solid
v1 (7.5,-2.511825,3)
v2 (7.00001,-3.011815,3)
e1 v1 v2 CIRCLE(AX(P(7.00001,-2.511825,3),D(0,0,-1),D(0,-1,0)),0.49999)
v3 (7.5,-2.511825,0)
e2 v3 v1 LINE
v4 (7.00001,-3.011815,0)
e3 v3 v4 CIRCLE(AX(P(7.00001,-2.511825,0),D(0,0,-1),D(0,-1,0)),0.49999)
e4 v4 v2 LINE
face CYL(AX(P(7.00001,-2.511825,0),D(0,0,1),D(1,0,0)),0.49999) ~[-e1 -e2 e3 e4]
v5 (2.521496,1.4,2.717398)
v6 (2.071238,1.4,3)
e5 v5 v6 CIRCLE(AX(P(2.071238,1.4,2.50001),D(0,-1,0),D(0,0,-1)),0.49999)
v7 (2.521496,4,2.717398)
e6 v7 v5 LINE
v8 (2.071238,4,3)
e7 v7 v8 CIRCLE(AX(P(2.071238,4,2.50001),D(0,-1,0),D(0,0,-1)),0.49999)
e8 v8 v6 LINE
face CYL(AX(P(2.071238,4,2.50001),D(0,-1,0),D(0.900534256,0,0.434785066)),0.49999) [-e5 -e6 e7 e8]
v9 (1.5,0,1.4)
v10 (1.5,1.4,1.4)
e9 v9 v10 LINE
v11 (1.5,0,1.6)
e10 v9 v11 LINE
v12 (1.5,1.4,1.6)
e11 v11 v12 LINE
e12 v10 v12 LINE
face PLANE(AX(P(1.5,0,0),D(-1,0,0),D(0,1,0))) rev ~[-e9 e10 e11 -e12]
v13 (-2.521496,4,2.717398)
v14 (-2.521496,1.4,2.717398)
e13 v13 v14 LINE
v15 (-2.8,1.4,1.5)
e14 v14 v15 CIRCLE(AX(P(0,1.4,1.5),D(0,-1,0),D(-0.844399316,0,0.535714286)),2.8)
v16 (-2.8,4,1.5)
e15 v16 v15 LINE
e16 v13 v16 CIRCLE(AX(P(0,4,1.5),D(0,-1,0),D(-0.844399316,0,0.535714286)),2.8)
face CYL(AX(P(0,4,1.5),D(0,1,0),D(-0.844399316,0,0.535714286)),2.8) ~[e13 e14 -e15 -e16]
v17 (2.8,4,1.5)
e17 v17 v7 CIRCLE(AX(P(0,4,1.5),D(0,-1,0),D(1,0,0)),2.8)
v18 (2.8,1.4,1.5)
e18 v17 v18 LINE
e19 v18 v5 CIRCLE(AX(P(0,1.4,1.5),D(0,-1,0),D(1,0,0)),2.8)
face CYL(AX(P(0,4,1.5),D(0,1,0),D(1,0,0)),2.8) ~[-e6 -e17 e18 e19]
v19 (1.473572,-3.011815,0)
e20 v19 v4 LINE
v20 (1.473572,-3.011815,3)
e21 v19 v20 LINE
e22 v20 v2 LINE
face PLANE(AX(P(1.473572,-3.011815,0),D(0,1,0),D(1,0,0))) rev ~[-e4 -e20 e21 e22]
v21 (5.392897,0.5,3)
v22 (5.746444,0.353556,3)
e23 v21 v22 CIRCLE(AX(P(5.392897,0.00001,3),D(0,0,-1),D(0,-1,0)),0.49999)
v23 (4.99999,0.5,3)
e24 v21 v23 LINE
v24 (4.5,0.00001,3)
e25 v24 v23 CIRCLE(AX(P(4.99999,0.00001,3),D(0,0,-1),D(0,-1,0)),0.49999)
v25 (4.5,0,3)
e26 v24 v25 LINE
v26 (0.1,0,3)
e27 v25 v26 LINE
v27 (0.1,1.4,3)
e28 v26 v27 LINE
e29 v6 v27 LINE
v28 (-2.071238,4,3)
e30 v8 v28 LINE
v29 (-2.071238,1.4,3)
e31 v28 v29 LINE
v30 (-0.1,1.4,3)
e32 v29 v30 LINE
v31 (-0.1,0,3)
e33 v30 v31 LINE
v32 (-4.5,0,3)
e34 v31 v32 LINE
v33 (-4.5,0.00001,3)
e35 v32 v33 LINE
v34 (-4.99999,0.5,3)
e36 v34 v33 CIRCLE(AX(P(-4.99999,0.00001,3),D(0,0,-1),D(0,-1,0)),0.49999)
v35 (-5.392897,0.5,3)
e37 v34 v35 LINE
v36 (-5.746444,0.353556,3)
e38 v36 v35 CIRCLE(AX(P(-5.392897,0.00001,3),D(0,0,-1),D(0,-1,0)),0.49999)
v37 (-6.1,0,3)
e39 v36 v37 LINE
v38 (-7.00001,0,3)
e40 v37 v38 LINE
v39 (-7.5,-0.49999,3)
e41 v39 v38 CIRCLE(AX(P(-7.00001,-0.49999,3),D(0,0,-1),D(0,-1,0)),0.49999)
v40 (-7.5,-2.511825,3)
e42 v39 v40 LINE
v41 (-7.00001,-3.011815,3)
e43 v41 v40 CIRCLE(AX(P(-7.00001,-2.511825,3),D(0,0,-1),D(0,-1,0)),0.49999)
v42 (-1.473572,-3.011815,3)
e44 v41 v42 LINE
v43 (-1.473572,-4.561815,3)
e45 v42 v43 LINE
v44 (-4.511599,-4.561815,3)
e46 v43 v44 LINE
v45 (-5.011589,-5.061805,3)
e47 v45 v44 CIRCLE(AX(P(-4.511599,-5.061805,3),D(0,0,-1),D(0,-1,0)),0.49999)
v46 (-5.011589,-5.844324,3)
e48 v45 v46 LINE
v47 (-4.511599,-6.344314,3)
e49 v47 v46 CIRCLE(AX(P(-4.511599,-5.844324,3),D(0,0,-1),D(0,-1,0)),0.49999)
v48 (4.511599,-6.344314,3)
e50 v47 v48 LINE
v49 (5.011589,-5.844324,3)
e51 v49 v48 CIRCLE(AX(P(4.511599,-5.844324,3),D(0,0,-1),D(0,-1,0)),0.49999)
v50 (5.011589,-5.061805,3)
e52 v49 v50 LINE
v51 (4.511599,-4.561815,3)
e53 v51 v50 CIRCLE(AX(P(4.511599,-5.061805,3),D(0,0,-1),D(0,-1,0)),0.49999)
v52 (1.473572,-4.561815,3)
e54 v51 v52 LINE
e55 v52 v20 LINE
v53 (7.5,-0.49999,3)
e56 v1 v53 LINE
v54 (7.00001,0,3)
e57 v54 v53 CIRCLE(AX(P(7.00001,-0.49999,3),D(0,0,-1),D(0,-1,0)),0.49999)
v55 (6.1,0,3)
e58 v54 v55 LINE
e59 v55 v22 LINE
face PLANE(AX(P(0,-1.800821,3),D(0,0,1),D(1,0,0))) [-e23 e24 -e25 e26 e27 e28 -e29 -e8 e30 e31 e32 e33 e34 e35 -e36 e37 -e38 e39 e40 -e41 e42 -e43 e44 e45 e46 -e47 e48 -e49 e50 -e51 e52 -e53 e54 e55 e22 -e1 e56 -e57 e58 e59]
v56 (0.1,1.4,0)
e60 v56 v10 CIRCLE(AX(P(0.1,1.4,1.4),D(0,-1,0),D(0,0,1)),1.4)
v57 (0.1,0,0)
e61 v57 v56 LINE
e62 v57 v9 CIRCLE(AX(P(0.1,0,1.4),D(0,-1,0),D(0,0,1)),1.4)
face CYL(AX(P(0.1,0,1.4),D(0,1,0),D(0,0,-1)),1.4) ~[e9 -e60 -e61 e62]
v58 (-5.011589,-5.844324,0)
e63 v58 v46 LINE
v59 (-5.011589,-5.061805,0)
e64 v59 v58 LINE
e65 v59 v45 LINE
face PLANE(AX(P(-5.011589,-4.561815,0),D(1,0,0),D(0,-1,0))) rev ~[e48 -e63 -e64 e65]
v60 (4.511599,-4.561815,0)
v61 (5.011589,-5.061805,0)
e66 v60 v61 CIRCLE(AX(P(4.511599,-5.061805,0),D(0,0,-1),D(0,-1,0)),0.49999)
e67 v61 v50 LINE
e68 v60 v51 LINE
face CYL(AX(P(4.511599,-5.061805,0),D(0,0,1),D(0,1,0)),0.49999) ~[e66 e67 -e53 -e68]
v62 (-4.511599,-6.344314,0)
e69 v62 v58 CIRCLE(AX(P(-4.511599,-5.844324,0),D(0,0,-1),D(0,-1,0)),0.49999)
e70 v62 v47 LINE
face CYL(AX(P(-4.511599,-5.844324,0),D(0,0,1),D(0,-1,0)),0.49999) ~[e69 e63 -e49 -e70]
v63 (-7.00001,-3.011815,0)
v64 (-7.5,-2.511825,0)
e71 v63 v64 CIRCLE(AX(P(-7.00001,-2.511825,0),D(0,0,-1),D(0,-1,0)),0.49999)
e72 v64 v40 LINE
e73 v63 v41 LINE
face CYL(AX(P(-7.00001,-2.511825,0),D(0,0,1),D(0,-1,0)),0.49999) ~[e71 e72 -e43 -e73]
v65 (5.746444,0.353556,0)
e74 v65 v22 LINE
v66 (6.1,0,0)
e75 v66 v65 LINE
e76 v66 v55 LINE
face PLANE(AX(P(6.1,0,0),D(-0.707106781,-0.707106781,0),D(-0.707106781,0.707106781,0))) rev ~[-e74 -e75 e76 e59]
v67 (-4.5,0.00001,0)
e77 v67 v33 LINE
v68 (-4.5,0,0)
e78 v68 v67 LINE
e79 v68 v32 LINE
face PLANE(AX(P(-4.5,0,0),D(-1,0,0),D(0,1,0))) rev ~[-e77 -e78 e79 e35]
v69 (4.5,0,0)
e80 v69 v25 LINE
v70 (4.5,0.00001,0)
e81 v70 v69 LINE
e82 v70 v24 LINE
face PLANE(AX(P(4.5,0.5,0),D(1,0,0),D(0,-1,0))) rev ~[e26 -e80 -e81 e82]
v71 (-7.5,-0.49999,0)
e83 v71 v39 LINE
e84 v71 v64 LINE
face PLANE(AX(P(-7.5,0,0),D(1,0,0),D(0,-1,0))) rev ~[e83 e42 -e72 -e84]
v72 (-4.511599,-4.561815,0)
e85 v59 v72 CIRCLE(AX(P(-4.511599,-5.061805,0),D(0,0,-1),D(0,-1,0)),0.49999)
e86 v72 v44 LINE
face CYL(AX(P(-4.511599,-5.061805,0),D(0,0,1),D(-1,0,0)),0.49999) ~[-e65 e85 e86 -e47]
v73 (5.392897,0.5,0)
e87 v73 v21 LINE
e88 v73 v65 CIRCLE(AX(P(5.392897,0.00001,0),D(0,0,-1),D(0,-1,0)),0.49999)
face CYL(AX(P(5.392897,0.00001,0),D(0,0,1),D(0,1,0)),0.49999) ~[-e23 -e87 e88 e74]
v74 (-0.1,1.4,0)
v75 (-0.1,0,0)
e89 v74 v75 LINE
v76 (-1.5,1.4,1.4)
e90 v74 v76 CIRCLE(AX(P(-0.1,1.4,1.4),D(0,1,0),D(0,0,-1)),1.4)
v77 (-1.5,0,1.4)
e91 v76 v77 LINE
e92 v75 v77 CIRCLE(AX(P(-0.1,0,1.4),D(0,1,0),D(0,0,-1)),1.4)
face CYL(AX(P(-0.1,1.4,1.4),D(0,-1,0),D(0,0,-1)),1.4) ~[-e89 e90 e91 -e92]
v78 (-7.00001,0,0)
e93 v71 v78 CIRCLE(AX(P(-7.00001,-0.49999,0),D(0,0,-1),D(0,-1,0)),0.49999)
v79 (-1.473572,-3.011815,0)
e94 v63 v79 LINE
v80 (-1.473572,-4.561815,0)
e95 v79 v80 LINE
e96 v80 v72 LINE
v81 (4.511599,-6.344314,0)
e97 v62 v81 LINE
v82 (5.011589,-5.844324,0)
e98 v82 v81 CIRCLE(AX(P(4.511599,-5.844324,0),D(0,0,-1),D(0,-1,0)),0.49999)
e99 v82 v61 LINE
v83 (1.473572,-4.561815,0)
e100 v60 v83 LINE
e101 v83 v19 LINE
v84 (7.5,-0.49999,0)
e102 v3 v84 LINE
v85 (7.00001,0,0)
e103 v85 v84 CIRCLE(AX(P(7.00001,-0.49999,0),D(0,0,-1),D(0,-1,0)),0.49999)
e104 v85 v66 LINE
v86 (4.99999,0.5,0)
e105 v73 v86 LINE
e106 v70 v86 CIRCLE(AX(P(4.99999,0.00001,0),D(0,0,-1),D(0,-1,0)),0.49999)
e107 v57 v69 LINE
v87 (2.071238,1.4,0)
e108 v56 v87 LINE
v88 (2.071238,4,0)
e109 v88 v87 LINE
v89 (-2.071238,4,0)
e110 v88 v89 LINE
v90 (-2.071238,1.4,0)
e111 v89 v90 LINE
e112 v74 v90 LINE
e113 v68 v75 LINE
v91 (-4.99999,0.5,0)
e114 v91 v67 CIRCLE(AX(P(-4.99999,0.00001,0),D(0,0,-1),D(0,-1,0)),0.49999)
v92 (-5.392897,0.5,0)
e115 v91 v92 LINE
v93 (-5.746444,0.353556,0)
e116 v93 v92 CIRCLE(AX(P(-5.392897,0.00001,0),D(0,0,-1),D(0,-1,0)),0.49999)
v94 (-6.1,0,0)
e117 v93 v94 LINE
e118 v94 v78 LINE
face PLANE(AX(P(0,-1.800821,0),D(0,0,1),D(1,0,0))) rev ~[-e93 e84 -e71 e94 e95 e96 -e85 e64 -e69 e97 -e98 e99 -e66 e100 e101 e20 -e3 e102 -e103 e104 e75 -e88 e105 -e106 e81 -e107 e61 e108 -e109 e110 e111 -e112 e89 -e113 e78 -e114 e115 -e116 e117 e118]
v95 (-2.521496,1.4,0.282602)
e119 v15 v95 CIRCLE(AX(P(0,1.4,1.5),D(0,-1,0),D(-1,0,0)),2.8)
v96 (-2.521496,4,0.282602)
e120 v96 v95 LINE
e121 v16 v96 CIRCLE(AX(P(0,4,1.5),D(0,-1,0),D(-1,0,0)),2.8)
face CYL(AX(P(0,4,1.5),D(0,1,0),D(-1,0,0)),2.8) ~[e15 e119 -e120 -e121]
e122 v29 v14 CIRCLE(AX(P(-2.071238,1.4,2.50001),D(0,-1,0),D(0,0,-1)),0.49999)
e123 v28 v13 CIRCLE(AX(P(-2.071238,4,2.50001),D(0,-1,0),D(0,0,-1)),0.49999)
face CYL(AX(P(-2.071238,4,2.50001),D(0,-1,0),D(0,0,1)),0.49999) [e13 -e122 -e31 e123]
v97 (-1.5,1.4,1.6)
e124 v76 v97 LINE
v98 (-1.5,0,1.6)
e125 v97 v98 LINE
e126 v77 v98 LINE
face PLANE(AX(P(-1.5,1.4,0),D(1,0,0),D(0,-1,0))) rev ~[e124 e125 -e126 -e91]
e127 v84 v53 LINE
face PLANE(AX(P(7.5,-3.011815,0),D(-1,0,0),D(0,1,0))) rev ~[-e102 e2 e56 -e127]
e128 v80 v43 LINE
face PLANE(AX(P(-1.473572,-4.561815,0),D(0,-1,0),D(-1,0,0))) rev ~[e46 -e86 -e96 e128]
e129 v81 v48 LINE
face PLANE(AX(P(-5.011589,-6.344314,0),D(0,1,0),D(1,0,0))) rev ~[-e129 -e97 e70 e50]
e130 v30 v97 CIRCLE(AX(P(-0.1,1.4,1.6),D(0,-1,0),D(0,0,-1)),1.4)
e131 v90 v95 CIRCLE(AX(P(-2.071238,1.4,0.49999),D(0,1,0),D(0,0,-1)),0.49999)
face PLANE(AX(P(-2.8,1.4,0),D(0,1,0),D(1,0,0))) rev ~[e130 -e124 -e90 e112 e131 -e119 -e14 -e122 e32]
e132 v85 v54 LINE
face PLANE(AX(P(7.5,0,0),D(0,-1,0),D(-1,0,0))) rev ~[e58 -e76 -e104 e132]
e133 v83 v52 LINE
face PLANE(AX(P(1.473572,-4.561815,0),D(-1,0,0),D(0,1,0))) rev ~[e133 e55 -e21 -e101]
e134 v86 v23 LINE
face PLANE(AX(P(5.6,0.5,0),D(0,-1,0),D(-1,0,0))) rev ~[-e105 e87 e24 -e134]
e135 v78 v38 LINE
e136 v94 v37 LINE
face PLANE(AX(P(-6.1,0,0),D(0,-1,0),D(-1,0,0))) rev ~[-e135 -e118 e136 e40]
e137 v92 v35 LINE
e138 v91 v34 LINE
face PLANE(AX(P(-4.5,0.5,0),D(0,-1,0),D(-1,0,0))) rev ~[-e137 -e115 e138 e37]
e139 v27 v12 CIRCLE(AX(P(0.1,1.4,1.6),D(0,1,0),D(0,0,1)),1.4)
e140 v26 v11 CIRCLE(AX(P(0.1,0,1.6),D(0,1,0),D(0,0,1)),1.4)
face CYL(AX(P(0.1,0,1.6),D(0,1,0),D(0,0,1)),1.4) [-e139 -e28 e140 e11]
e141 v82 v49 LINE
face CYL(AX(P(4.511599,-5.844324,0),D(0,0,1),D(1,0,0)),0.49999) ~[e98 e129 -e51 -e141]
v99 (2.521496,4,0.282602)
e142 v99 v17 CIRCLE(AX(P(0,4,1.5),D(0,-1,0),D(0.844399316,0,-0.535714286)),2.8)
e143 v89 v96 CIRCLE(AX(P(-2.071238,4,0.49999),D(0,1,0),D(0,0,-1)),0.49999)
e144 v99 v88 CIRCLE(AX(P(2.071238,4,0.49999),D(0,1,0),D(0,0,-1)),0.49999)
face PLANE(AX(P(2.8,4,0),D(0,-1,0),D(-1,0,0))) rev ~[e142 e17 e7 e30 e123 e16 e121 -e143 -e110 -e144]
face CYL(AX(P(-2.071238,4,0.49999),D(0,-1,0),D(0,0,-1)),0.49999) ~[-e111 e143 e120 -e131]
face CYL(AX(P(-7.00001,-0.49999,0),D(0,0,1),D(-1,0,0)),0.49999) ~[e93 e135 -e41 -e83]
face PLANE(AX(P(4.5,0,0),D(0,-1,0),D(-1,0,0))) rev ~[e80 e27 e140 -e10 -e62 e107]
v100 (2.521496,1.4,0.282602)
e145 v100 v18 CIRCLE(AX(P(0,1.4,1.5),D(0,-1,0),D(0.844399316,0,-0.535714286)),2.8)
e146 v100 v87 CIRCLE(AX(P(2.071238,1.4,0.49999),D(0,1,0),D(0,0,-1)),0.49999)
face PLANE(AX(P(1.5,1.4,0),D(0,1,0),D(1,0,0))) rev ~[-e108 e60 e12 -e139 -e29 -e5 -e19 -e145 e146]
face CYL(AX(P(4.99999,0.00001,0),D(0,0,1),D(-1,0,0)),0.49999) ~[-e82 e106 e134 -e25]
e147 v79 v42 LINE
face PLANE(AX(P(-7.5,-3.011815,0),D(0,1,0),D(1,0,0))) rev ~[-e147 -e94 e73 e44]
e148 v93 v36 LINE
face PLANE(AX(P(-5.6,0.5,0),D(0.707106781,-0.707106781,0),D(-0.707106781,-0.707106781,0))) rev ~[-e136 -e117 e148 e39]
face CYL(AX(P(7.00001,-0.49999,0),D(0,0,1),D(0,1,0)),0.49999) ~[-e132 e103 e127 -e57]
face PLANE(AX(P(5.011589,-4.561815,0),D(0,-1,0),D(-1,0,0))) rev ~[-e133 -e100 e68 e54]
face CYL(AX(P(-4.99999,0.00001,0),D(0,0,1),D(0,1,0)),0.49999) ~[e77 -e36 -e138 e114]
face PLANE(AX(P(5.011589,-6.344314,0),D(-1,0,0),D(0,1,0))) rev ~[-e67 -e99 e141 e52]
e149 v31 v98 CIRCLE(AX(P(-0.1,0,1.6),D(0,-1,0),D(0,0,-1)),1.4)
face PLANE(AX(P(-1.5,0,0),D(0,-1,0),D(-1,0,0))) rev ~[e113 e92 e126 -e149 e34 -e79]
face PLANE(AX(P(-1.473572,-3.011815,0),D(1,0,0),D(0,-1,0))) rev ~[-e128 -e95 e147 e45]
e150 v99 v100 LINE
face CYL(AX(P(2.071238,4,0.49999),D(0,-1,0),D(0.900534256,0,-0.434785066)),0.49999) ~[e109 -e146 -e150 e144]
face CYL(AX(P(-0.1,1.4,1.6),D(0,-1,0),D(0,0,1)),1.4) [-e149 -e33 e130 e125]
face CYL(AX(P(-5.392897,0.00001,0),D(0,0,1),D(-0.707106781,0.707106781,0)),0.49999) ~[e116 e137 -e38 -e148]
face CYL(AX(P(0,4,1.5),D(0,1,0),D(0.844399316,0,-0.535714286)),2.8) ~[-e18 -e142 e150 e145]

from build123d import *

# Parameters (mm, degrees)
F2_DEPTH = 3
F4_DEPTH = 2.6
F5_R     = 0.49999
F6_R     = 1.4


# Not quite as in the source:
# - a fillet or chamfer is up to 0.001 mm smaller than in the source, because OpenCascade refuses the exact size


with BuildPart() as f2:
    # F1 (on Top) → F2 (new body)
    with BuildSketch(Plane.XY):
        Polygon((2.8, 1.4), (2.8, 4), (-2.8, 4), (-2.8, 1.4), (-1.5, 1.4), (-1.5, 0), (-4.5, 0), (-4.5, 0.5), (-5.6, 0.5), (-6.1, 0), (-7.5, 0), (-7.5, -3.0118150752), (-1.4735722734, -3.0118150752), (-1.4735722734, -4.5618148234), (-5.01158851, -4.5618148234), (-5.01158851, -6.3443139292), (5.01158851, -6.3443139292), (5.01158851, -4.5618148234), (1.4735722734, -4.5618148234), (1.4735722734, -3.0118150752), (7.5, -3.0118150752), (7.5, 0), (6.1, 0), (5.6, 0.5), (4.5, 0.5), (4.5, 0), (1.5, 0), (1.5, 1.4), align=None)
    extrude(amount=F2_DEPTH)

    # F3 (on face) → F4 (cut, through all)
    with BuildSketch(Plane(origin=(0, 4, 0), x_dir=(-1, 0, 0), z_dir=(0, 1, 0))):
        with BuildLine():
            Line((2.8, 0), (2.8, 1.5))
            ThreePointArc((2.8, 1.5), (2.6888743587, 0.7190040441), (2.3643180835, 0))
            Line((2.3643180835, 0), (2.8, 0))
        make_face()
        with BuildLine():
            ThreePointArc((2.3643180835, 3), (2.6888743587, 2.2809959559), (2.8, 1.5))
            Line((2.8, 1.5), (2.8, 3))
            Line((2.8, 3), (2.3643180835, 3))
        make_face()
        with BuildLine():
            ThreePointArc((-2.3643180835, 0), (0, -1.3), (2.3643180835, 0))
            Line((2.3643180835, 0), (-2.3643180835, 0))
        make_face()
        with BuildLine():
            ThreePointArc((-2.8, 1.5), (-2.6888743587, 2.2809959559), (-2.3643180835, 3))
            Line((-2.3643180835, 3), (-2.8, 3))
            Line((-2.8, 3), (-2.8, 1.5))
        make_face()
        with BuildLine():
            Line((-2.8, 0), (-2.3643180835, 0))
            ThreePointArc((-2.3643180835, 0), (-2.6888743587, 0.7190040441), (-2.8, 1.5))
            Line((-2.8, 1.5), (-2.8, 0))
        make_face()
    extrude(amount=-F4_DEPTH, mode=Mode.SUBTRACT)

    # F5 (radius 0.5 in the source; OpenCascade refuses exactly that, so slightly less here)
    f5_edges = [f2.edges().sort_by_distance(p)[0] for p in [
        (4.5, 0.5, 1.5),
        (5.6, 0.5, 1.5),
        (7.5, 0, 1.5),
        (7.5, -3.011815, 1.5),
        (5.011589, -4.561815, 1.5),
        (5.011589, -6.344314, 1.5),
        (-4.5, 0.5, 1.5),
        (-5.6, 0.5, 1.5),
        (-7.5, 0, 1.5),
        (-7.5, -3.011815, 1.5),
        (-5.011589, -6.344314, 1.5),
        (-5.011589, -4.561815, 1.5),
        (2.364318, 2.7, 3),
        (-2.364318, 2.7, 3),
        (2.364318, 2.7, 0),
        (-2.364318, 2.7, 0),
    ]]
    fillet(f5_edges, radius=F5_R)

    # F6
    f6_edges = [f2.edges().sort_by_distance(p)[0] for p in [
        (1.5, 0.7, 3),
        (-1.5, 0.7, 3),
        (1.5, 0.7, 0),
        (-1.5, 0.7, 0),
    ]]
    fillet(f6_edges, radius=F6_R)


solid = f2.part
